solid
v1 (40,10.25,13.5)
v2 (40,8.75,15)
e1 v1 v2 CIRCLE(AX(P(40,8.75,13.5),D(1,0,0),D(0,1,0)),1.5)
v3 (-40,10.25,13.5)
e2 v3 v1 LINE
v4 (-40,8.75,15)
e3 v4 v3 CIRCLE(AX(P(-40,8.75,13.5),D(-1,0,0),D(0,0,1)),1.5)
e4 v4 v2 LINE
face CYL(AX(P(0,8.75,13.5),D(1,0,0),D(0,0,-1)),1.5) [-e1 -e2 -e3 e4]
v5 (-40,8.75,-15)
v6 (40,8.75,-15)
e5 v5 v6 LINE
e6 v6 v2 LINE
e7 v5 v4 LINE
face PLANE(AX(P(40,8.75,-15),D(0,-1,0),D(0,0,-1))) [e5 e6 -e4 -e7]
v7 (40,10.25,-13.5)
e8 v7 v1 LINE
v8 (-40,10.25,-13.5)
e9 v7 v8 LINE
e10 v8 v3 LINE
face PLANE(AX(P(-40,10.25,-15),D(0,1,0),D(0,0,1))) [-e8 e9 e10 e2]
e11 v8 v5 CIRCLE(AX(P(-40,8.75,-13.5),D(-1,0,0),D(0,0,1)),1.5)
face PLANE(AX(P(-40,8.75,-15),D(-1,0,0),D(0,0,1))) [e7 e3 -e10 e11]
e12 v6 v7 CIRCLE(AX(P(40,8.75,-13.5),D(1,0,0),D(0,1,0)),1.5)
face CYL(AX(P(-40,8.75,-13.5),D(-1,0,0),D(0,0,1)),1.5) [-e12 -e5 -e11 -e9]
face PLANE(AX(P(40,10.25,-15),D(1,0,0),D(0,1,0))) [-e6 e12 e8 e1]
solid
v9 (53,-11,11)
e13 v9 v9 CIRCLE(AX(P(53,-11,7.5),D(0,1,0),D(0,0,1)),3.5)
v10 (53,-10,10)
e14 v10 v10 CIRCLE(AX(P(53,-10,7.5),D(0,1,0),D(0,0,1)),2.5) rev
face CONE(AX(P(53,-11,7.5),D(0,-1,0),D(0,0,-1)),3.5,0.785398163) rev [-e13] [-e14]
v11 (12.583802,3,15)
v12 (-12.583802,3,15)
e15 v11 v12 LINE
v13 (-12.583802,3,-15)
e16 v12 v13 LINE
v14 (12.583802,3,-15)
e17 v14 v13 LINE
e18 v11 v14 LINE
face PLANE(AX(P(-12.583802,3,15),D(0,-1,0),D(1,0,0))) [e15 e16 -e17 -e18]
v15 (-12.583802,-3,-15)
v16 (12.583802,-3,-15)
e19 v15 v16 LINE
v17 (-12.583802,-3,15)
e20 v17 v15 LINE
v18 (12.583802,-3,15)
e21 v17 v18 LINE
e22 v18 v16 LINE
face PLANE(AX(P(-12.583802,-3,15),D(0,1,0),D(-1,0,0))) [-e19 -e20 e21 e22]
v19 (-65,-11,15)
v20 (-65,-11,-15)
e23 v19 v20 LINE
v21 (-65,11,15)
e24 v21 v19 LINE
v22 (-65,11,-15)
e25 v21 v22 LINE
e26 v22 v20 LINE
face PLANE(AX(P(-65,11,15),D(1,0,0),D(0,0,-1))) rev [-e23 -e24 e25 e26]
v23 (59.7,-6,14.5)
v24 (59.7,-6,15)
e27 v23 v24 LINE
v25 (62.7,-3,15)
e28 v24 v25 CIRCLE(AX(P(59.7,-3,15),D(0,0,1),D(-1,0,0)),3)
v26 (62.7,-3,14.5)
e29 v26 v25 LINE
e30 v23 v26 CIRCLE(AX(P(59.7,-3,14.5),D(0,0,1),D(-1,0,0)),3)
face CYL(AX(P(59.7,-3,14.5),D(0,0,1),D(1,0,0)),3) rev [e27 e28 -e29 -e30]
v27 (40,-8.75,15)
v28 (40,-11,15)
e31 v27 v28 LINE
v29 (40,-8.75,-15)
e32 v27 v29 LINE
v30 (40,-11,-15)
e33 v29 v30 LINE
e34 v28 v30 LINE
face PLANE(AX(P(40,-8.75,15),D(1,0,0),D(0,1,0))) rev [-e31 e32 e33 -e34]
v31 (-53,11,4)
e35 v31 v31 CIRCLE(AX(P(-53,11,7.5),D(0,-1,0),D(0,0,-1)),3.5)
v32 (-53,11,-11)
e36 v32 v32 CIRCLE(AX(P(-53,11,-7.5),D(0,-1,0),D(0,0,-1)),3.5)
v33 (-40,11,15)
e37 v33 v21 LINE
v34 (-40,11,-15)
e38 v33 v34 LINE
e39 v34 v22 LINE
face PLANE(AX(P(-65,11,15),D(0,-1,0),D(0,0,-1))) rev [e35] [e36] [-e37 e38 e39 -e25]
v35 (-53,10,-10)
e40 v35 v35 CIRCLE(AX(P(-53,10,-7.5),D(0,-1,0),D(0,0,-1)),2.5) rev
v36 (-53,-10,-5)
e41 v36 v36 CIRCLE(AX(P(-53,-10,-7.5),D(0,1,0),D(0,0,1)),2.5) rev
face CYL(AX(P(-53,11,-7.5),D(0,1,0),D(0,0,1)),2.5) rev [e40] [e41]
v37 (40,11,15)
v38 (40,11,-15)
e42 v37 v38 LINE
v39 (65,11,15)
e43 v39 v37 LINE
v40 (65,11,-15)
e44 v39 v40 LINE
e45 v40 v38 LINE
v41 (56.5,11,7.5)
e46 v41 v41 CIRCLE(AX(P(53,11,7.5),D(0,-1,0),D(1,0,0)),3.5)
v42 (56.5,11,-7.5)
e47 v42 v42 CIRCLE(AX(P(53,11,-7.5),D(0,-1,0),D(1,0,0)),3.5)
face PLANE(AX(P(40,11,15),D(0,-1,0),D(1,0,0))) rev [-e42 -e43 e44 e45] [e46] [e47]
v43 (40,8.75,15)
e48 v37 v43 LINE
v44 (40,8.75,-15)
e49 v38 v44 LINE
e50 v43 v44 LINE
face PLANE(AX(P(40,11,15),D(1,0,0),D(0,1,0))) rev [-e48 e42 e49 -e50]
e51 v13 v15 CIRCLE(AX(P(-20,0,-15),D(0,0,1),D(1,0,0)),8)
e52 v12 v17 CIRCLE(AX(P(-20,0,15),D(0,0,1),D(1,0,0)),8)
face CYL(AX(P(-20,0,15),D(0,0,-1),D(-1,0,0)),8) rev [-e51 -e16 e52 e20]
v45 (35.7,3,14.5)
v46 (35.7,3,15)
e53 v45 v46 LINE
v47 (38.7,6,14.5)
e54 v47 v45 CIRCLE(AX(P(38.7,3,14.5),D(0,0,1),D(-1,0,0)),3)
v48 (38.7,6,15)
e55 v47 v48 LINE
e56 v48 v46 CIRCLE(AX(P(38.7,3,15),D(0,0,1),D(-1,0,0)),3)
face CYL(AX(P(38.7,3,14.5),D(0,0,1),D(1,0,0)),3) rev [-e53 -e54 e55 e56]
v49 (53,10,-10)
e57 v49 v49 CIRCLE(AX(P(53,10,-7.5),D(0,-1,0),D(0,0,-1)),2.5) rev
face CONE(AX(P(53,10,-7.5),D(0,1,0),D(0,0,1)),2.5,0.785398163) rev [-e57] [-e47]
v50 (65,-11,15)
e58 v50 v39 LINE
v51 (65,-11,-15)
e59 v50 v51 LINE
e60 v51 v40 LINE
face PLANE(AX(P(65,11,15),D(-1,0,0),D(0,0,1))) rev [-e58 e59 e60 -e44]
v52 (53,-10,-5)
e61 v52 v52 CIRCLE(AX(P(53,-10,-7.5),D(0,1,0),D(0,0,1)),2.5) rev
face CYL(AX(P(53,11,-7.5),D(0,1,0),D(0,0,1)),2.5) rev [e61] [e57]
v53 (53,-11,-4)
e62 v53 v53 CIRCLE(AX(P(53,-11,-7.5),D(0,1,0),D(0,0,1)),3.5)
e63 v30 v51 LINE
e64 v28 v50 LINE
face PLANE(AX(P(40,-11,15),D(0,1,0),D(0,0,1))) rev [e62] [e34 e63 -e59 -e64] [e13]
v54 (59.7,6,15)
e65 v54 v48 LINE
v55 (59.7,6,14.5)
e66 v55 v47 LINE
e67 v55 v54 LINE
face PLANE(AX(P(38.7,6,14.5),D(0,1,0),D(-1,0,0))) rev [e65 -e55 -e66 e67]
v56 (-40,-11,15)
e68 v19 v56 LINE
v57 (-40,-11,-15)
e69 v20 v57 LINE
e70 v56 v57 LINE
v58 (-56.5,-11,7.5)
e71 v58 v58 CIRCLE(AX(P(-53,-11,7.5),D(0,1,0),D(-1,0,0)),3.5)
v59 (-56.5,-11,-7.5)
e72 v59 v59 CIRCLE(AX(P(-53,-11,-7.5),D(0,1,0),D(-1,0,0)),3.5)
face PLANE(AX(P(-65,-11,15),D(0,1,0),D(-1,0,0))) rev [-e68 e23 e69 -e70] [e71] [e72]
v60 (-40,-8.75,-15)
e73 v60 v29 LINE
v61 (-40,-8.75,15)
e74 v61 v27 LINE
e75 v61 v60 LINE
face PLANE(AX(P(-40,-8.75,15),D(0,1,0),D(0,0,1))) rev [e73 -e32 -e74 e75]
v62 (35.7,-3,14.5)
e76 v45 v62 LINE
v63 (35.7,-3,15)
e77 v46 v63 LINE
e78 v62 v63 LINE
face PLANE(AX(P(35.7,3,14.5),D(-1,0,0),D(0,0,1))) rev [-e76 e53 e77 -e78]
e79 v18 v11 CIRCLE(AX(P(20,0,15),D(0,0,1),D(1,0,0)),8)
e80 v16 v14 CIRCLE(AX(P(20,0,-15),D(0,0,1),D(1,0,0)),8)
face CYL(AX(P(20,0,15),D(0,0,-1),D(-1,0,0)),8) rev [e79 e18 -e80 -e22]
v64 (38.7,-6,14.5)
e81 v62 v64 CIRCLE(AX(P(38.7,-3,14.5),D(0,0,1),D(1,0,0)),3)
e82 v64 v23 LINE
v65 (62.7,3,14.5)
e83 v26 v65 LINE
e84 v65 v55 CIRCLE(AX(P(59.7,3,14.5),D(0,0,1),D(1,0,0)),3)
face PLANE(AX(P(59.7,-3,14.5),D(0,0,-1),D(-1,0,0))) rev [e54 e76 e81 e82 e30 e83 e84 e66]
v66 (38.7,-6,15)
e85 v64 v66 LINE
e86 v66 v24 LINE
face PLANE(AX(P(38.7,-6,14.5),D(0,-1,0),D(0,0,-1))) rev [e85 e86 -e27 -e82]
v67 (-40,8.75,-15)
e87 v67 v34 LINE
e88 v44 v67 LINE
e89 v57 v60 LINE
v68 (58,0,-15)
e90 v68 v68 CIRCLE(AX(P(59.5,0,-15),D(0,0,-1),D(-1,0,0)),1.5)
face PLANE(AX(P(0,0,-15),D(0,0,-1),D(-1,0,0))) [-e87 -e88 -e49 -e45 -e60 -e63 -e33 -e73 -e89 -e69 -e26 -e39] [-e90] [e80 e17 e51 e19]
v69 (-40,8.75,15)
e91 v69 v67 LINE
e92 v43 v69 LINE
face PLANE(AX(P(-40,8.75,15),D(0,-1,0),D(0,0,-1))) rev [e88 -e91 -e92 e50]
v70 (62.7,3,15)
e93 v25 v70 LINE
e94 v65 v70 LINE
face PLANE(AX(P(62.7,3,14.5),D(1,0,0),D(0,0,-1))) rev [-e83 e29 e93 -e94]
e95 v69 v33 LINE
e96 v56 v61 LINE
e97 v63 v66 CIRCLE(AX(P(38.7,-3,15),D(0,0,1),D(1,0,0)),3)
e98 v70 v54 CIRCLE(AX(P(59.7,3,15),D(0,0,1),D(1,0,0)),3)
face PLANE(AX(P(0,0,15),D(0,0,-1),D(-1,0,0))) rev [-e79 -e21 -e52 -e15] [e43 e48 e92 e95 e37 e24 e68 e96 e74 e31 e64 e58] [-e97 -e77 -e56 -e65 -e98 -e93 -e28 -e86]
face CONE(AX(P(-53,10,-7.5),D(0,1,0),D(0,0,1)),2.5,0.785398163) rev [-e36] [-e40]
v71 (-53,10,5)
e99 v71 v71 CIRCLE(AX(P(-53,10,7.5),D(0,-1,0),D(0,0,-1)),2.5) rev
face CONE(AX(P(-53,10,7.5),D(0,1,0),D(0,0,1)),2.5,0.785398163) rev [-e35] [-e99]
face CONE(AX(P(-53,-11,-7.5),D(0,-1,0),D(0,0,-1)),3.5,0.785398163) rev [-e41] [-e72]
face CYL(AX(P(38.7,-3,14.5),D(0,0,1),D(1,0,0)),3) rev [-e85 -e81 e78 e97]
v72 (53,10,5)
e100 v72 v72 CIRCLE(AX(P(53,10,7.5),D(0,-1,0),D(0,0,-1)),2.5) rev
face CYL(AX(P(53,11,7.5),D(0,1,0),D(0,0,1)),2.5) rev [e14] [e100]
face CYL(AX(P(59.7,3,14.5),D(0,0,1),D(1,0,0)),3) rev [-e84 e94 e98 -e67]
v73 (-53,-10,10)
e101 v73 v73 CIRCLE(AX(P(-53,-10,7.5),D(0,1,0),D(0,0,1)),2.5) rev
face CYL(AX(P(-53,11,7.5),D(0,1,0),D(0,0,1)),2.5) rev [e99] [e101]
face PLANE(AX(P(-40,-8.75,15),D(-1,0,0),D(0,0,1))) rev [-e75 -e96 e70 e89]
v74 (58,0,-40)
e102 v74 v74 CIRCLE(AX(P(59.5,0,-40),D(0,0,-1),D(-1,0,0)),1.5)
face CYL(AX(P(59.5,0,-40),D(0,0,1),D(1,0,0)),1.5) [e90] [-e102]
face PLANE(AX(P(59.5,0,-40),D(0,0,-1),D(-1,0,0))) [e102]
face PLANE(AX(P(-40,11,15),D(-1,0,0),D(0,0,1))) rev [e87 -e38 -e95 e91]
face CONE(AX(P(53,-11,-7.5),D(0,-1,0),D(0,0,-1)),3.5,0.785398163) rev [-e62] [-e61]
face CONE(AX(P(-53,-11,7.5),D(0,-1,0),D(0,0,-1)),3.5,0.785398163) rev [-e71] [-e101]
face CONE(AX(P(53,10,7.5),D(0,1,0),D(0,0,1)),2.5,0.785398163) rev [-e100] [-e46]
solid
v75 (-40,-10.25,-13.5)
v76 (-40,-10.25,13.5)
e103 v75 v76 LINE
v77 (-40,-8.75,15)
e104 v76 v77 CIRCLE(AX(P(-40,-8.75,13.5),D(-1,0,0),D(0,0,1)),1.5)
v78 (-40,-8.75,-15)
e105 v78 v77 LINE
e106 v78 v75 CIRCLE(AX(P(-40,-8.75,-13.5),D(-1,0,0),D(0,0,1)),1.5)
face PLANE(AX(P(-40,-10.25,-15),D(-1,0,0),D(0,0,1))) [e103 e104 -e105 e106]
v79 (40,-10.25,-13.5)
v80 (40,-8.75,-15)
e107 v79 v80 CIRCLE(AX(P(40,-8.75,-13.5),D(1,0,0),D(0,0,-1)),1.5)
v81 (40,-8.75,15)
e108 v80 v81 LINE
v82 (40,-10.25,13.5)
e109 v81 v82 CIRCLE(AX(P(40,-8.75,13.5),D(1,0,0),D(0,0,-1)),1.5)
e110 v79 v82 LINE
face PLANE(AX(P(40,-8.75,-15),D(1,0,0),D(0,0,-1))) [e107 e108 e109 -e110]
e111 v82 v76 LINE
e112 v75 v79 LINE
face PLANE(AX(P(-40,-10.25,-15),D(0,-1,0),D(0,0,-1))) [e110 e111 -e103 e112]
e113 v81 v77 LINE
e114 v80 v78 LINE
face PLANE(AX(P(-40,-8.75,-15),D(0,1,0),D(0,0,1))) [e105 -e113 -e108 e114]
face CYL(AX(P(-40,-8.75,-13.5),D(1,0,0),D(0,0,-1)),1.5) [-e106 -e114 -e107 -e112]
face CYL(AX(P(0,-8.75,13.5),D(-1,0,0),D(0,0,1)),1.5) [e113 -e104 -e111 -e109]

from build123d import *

# Parameters (mm, degrees)
EXTRUDE_1_DEPTH     = 15
HOLE_WIZARD_M6_1_D  = 5
CHAMFER_1_SIZE      = 1
SKETCH_4_W          = 80
SKETCH_4_H          = 1.5
EXTRUDE_2_DEPTH     = 30
EXTRUDE_2_2_DEPTH   = 30
FILLET_1_R          = 1.5
FILLET_2_R          = 1.5
CUT_EXTRUDE_1_DEPTH = 0.5
SKETCH_6_R          = 1.5
EXTRUDE_3_DEPTH     = 25


with BuildPart() as part:
    # 草图1 → 凸台-拉伸1 (new, symmetric)
    with BuildSketch(Plane.XY):
        Polygon((-40, 11), (-40, 8.75), (40, 8.75), (40, 11), (65, 11), (65, -11), (40, -11), (40, -8.75), (-40, -8.75), (-40, -11), (-65, -11), (-65, 11), align=None)
        with BuildLine():
            Line((-12.583801513, -3), (12.583801513, -3))
            ThreePointArc((12.583801513, -3), (28, 0), (12.583801513, 3))
            Line((12.583801513, 3), (-12.583801513, 3))
            ThreePointArc((-12.583801513, 3), (-28, 0), (-12.583801513, -3))
        make_face(mode=Mode.SUBTRACT)
    extrude(amount=EXTRUDE_1_DEPTH, both=True)

    # M6 螺纹孔1 (through all)
    with Locations(Plane(origin=(-53, 11, -7.5), x_dir=(0, 0, 1), z_dir=(0, 1, 0))):
        with Locations((0, 0), (15, 0), (0, 106), (15, 106)):
            Hole(HOLE_WIZARD_M6_1_D / 2)

    # 倒角1
    chamfer_1_edges = [part.edges().sort_by_distance(p)[0] for p in [
        (53, 11, 10),
        (53, -11, 10),
        (53, 11, -5),
        (53, -11, -5),
        (-53, 11, 10),
        (-53, -11, 10),
        (-53, 11, -5),
        (-53, -11, -5),
    ]]
    chamfer(chamfer_1_edges, length=CHAMFER_1_SIZE)

    # 草图5 → 切除-拉伸1 (cut)
    with BuildSketch(Plane.XY.offset(15)):
        with BuildLine():
            Line((38.7, 6), (59.7, 6))
            ThreePointArc((59.7, 6), (61.821320344, 5.121320344), (62.7, 3))
            Line((62.7, 3), (62.7, -3))
            ThreePointArc((62.7, -3), (61.821320344, -5.121320344), (59.7, -6))
            Line((59.7, -6), (38.7, -6))
            ThreePointArc((38.7, -6), (36.578679656, -5.121320344), (35.7, -3))
            Line((35.7, -3), (35.7, 3))
            ThreePointArc((35.7, 3), (36.578679656, 5.121320344), (38.7, 6))
        make_face()
    extrude(amount=-CUT_EXTRUDE_1_DEPTH, mode=Mode.SUBTRACT)

    # 草图6 → 凸台-拉伸3 (add)
    with BuildSketch(Plane(origin=(0, 0, -15), x_dir=(-1, 0, 0), z_dir=(0, 0, -1))):
        with Locations((-59.5, 0)):
            Circle(SKETCH_6_R)
    extrude(amount=EXTRUDE_3_DEPTH)


with BuildPart() as body_2:
    # 草图4 → 凸台-拉伸2 (new body)
    with BuildSketch(Plane.XY.offset(15)):
        with Locations((0, 9.5)):
            Rectangle(SKETCH_4_W, SKETCH_4_H)
    extrude(amount=-EXTRUDE_2_DEPTH)

    # 圆角1
    fillet_1_edges = [body_2.edges().sort_by_distance(p)[0] for p in [
        (0, 10.25, -15),
        (0, 10.25, 15),
    ]]
    fillet(fillet_1_edges, radius=FILLET_1_R - 0.0001)  # a hair under: the kernel refuses the full size


with BuildPart() as body_3:
    # 草图4 → Extrude 2 2 (new body)
    with BuildSketch(Plane.XY.offset(15)):
        with Locations((0, -9.5)):
            Rectangle(SKETCH_4_W, SKETCH_4_H)
    extrude(amount=-EXTRUDE_2_2_DEPTH)

    # 圆角2
    fillet_2_edges = [body_3.edges().sort_by_distance(p)[0] for p in [
        (0, -10.25, -15),
        (0, -10.25, 15),
    ]]
    fillet(fillet_2_edges, radius=FILLET_2_R - 0.0001)  # a hair under: the kernel refuses the full size


solid = Compound([part.part, body_2.part, body_3.part])
